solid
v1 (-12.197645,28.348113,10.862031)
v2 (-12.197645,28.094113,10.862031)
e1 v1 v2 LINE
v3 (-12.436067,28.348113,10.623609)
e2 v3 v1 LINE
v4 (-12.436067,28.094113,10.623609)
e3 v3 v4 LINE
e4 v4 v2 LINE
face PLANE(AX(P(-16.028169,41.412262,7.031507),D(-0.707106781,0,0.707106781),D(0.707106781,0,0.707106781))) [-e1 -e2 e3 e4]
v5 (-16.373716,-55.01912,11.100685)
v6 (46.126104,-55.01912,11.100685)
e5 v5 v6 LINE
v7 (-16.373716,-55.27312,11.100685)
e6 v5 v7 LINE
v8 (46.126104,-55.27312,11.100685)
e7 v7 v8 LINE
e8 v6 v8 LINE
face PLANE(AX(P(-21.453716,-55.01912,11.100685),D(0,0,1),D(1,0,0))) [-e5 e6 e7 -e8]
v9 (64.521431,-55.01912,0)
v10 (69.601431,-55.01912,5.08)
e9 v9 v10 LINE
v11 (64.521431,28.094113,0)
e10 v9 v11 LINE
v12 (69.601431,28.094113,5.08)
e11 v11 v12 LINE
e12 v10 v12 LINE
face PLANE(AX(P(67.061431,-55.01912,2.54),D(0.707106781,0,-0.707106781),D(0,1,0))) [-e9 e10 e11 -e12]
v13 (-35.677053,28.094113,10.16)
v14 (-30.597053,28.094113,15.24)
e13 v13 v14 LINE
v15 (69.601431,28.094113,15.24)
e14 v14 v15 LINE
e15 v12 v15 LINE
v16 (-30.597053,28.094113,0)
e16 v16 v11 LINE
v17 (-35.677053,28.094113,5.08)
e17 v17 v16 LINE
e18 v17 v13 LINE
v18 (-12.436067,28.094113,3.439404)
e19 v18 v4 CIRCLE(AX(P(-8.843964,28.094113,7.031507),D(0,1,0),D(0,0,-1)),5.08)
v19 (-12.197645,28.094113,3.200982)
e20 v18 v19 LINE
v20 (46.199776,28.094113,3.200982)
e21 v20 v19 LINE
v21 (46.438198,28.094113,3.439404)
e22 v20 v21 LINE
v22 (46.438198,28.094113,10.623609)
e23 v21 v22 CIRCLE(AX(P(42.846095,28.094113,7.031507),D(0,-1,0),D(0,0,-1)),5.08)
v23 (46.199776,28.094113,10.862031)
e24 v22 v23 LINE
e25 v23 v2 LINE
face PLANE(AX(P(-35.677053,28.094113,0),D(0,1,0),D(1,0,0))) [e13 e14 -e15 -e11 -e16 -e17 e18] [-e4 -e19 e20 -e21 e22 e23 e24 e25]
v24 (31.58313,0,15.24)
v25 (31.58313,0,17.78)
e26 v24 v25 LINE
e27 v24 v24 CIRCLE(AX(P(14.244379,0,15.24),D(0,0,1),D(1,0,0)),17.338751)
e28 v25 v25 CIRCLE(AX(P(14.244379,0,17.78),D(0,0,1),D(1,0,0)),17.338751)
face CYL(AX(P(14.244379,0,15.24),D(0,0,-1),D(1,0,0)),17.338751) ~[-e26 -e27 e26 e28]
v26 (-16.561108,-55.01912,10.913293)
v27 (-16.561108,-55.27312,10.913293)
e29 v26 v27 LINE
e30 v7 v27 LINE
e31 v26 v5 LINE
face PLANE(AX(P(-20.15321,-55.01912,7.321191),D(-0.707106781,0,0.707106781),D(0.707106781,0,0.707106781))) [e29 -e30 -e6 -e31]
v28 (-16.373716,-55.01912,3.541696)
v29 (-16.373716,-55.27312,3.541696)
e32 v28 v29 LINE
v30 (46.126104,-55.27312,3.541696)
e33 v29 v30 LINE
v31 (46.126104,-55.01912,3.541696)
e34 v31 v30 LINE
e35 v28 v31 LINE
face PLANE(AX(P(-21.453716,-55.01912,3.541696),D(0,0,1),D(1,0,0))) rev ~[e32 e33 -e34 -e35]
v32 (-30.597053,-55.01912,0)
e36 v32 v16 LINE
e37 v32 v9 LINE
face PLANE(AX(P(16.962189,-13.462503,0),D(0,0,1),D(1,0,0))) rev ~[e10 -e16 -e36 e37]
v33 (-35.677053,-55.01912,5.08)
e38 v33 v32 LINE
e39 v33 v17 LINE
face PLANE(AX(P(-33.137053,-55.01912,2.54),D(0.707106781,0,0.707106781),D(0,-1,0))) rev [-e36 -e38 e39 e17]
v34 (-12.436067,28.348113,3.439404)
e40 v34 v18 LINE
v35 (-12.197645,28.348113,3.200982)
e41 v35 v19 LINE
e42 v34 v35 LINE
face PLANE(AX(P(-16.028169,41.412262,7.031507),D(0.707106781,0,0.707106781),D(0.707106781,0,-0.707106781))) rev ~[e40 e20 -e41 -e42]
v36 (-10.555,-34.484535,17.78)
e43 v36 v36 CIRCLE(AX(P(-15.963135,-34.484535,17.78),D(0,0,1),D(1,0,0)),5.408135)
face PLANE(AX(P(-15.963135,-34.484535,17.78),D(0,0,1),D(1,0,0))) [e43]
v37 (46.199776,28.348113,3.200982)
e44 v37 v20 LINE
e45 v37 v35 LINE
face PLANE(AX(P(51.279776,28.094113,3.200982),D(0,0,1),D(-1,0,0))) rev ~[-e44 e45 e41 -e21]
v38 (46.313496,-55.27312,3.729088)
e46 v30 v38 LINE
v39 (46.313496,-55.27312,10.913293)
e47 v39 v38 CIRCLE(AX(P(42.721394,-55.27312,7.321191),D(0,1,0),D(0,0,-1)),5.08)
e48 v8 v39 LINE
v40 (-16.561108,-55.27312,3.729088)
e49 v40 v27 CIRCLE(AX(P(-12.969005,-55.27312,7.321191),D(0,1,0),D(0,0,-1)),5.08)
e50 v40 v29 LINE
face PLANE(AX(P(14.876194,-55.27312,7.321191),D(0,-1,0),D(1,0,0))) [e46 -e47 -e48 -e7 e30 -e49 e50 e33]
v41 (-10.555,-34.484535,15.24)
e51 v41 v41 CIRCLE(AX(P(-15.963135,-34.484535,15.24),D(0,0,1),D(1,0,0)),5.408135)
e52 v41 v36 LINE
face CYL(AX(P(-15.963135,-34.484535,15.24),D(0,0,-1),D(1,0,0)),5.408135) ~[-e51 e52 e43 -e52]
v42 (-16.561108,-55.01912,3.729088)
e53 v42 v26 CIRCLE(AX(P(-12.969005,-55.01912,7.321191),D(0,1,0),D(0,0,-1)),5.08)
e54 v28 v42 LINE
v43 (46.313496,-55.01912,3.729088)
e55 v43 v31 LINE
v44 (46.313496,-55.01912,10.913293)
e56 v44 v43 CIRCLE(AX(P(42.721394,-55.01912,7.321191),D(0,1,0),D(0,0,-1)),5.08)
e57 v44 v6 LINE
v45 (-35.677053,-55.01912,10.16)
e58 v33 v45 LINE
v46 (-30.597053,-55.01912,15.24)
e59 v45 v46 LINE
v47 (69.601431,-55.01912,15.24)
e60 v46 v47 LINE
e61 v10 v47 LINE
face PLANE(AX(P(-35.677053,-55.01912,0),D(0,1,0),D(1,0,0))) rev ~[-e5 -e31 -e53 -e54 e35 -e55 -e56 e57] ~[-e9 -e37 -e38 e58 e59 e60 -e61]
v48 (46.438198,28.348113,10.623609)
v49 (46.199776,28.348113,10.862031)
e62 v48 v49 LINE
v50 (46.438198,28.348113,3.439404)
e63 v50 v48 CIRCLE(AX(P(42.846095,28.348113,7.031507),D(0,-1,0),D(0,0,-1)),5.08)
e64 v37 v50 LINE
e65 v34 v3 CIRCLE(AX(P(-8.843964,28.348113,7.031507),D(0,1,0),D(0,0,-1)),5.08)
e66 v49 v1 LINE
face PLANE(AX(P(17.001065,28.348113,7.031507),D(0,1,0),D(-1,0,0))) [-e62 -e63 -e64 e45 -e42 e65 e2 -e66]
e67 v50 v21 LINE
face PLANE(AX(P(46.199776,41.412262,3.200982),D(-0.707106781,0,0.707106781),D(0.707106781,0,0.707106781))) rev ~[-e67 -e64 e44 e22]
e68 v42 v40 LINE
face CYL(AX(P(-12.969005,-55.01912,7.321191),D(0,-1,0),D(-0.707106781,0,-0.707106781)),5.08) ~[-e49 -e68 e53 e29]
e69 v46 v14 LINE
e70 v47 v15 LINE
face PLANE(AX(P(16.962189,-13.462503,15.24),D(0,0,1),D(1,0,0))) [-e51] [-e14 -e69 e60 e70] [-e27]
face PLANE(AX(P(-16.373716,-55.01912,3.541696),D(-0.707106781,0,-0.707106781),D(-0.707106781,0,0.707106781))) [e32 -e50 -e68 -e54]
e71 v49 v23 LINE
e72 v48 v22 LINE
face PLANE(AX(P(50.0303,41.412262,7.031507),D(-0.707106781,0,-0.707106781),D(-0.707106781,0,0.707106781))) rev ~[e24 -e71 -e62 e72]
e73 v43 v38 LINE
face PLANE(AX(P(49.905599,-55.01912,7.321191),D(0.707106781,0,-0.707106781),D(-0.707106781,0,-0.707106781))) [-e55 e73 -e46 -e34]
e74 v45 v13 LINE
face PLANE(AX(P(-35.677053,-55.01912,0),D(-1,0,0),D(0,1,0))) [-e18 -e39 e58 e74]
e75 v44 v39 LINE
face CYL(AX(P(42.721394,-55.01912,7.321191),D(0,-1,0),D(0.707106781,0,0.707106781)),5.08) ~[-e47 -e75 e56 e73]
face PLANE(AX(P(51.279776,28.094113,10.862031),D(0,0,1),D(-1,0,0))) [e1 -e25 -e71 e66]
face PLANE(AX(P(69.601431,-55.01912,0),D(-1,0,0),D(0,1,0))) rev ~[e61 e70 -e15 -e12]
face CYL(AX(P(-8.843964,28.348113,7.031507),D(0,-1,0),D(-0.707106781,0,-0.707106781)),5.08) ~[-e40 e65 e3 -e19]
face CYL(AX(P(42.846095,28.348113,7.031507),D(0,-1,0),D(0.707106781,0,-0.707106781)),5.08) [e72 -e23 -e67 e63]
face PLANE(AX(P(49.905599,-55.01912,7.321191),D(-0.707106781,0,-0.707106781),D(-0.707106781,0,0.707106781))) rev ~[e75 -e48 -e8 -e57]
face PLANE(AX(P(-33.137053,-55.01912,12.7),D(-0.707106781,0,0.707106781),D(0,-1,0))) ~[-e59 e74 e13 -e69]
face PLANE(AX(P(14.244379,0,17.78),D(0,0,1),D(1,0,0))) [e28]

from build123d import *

# Parameters (mm, degrees)
F0_W         = 105.2784845233
F0_H         = 83.1132326275
F1_DEPTH     = 15.24
F2_SIZE      = 5.08
F3_SIZE      = 5.08
F4_R         = 17.3387510066
F4_R_2       = 5.4081350991
F5_DEPTH     = 2.54
F6_W         = 68.5574207455
F6_H         = 7.6610487886
F7_DEPTH     = 0.254
F8_W         = 72.6598203182
F8_H         = 7.5589888729
F9_DEPTH     = 0.254
F10_T1_DEPTH = 13.3181495789
F11_R        = 5.08
F12_T1_DEPTH = 13.3181495789
F13_R        = 5.08


# Not quite as in the source:
# - a fillet or chamfer that OpenCascade refuses, or shapes differently, is made with other operations: its cross-section is extruded or revolved along the edge and cut away or added


with BuildPart() as f1:
    # F0 (on Top) → F1 (new body)
    with BuildSketch(Plane.XY):
        with Locations((16.9621892273, -13.4625034407)):
            Rectangle(F0_W, F0_H)
    extrude(amount=F1_DEPTH)

    # F2
    f2_edges = [f1.edges().sort_by_distance(p)[0] for p in [
        (-35.677053, -13.462503, 15.24),
        (-35.677053, -13.462503, 0),
    ]]
    chamfer(f2_edges, length=F2_SIZE)

    # F3
    f3_edges = [f1.edges().sort_by_distance(p)[0] for p in [
        (69.601431, -13.462503, 0),
    ]]
    chamfer(f3_edges, length=F3_SIZE)

    # F4 (on face) → F5 (join)
    with BuildSketch(Plane.XY.offset(15.24)):
        with Locations((14.2443789936, 0)):
            Circle(F4_R)
        with Locations((-15.9631352872, -34.4845345244)):
            Circle(F4_R_2)
    extrude(amount=F5_DEPTH)

    # F6 (on face) → F7 (join)
    with BuildSketch(Plane(origin=(0, 28.0941128731, 0), x_dir=(-1, 0, 0), z_dir=(0, 1, 0))):
        with Locations((-17.0010654256, 7.0315066259)):
            Rectangle(F6_W, F6_H)
    extrude(amount=F7_DEPTH)

    # F8 (on face) → F9 (join)
    with BuildSketch(Plane.XZ.offset(55.0191197544)):
        with Locations((14.8761942983, 7.3211907875)):
            Rectangle(F8_W, F8_H)
    extrude(amount=F9_DEPTH)

    # F10: chamfer of 5.08 on 4 edges, made by hand

    # F10_s2 → F10_t1 (cut)
    with BuildSketch(Plane.XZ.offset(55.0191197544)):
        Polygon((51.2061044574, 8.621696351), (46.1261044574, 3.541696351), (51.2061044574, 3.541696351), align=None)
        Polygon((51.2061044574, 6.0206852239), (46.1261044574, 11.1006852239), (51.2061044574, 11.1006852239), align=None)
        Polygon((-21.4537158608, 6.0206852239), (-16.3737158608, 11.1006852239), (-21.4537158608, 11.1006852239), align=None)
        Polygon((-16.3737158608, 3.541696351), (-21.4537158608, 8.621696351), (-21.4537158608, 3.541696351), align=None)
    extrude(amount=F10_T1_DEPTH, mode=Mode.SUBTRACT)

    # F11
    f11_edges = [f1.edges().sort_by_distance(p)[0] for p in [
        (-20.15321, -55.14612, 7.321191),
        (49.905599, -55.14612, 7.321191),
    ]]
    fillet(f11_edges, radius=F11_R)

    # F12: chamfer of 5.08 on 4 edges, made by hand

    # F12_s2 → F12_t1 (cut)
    with BuildSketch(Plane.XZ.offset(-41.4122624519)):
        Polygon((51.2797757983, 5.7820310202), (46.1997757983, 10.8620310202), (51.2797757983, 10.8620310202), align=None)
        Polygon((46.1997757983, 3.2009822316), (51.2797757983, 8.2809822316), (51.2797757983, 3.2009822316), align=None)
        Polygon((-17.2776449472, 8.2809822316), (-12.1976449472, 3.2009822316), (-17.2776449472, 3.2009822316), align=None)
        Polygon((-17.2776449472, 5.7820310202), (-12.1976449472, 10.8620310202), (-17.2776449472, 10.8620310202), align=None)
    extrude(amount=F12_T1_DEPTH, mode=Mode.SUBTRACT)

    # F13
    f13_edges = [f1.edges().sort_by_distance(p)[0] for p in [
        (-16.028169, 28.221113, 7.031507),
        (50.0303, 28.221113, 7.031507),
    ]]
    fillet(f13_edges, radius=F13_R)


solid = f1.part
